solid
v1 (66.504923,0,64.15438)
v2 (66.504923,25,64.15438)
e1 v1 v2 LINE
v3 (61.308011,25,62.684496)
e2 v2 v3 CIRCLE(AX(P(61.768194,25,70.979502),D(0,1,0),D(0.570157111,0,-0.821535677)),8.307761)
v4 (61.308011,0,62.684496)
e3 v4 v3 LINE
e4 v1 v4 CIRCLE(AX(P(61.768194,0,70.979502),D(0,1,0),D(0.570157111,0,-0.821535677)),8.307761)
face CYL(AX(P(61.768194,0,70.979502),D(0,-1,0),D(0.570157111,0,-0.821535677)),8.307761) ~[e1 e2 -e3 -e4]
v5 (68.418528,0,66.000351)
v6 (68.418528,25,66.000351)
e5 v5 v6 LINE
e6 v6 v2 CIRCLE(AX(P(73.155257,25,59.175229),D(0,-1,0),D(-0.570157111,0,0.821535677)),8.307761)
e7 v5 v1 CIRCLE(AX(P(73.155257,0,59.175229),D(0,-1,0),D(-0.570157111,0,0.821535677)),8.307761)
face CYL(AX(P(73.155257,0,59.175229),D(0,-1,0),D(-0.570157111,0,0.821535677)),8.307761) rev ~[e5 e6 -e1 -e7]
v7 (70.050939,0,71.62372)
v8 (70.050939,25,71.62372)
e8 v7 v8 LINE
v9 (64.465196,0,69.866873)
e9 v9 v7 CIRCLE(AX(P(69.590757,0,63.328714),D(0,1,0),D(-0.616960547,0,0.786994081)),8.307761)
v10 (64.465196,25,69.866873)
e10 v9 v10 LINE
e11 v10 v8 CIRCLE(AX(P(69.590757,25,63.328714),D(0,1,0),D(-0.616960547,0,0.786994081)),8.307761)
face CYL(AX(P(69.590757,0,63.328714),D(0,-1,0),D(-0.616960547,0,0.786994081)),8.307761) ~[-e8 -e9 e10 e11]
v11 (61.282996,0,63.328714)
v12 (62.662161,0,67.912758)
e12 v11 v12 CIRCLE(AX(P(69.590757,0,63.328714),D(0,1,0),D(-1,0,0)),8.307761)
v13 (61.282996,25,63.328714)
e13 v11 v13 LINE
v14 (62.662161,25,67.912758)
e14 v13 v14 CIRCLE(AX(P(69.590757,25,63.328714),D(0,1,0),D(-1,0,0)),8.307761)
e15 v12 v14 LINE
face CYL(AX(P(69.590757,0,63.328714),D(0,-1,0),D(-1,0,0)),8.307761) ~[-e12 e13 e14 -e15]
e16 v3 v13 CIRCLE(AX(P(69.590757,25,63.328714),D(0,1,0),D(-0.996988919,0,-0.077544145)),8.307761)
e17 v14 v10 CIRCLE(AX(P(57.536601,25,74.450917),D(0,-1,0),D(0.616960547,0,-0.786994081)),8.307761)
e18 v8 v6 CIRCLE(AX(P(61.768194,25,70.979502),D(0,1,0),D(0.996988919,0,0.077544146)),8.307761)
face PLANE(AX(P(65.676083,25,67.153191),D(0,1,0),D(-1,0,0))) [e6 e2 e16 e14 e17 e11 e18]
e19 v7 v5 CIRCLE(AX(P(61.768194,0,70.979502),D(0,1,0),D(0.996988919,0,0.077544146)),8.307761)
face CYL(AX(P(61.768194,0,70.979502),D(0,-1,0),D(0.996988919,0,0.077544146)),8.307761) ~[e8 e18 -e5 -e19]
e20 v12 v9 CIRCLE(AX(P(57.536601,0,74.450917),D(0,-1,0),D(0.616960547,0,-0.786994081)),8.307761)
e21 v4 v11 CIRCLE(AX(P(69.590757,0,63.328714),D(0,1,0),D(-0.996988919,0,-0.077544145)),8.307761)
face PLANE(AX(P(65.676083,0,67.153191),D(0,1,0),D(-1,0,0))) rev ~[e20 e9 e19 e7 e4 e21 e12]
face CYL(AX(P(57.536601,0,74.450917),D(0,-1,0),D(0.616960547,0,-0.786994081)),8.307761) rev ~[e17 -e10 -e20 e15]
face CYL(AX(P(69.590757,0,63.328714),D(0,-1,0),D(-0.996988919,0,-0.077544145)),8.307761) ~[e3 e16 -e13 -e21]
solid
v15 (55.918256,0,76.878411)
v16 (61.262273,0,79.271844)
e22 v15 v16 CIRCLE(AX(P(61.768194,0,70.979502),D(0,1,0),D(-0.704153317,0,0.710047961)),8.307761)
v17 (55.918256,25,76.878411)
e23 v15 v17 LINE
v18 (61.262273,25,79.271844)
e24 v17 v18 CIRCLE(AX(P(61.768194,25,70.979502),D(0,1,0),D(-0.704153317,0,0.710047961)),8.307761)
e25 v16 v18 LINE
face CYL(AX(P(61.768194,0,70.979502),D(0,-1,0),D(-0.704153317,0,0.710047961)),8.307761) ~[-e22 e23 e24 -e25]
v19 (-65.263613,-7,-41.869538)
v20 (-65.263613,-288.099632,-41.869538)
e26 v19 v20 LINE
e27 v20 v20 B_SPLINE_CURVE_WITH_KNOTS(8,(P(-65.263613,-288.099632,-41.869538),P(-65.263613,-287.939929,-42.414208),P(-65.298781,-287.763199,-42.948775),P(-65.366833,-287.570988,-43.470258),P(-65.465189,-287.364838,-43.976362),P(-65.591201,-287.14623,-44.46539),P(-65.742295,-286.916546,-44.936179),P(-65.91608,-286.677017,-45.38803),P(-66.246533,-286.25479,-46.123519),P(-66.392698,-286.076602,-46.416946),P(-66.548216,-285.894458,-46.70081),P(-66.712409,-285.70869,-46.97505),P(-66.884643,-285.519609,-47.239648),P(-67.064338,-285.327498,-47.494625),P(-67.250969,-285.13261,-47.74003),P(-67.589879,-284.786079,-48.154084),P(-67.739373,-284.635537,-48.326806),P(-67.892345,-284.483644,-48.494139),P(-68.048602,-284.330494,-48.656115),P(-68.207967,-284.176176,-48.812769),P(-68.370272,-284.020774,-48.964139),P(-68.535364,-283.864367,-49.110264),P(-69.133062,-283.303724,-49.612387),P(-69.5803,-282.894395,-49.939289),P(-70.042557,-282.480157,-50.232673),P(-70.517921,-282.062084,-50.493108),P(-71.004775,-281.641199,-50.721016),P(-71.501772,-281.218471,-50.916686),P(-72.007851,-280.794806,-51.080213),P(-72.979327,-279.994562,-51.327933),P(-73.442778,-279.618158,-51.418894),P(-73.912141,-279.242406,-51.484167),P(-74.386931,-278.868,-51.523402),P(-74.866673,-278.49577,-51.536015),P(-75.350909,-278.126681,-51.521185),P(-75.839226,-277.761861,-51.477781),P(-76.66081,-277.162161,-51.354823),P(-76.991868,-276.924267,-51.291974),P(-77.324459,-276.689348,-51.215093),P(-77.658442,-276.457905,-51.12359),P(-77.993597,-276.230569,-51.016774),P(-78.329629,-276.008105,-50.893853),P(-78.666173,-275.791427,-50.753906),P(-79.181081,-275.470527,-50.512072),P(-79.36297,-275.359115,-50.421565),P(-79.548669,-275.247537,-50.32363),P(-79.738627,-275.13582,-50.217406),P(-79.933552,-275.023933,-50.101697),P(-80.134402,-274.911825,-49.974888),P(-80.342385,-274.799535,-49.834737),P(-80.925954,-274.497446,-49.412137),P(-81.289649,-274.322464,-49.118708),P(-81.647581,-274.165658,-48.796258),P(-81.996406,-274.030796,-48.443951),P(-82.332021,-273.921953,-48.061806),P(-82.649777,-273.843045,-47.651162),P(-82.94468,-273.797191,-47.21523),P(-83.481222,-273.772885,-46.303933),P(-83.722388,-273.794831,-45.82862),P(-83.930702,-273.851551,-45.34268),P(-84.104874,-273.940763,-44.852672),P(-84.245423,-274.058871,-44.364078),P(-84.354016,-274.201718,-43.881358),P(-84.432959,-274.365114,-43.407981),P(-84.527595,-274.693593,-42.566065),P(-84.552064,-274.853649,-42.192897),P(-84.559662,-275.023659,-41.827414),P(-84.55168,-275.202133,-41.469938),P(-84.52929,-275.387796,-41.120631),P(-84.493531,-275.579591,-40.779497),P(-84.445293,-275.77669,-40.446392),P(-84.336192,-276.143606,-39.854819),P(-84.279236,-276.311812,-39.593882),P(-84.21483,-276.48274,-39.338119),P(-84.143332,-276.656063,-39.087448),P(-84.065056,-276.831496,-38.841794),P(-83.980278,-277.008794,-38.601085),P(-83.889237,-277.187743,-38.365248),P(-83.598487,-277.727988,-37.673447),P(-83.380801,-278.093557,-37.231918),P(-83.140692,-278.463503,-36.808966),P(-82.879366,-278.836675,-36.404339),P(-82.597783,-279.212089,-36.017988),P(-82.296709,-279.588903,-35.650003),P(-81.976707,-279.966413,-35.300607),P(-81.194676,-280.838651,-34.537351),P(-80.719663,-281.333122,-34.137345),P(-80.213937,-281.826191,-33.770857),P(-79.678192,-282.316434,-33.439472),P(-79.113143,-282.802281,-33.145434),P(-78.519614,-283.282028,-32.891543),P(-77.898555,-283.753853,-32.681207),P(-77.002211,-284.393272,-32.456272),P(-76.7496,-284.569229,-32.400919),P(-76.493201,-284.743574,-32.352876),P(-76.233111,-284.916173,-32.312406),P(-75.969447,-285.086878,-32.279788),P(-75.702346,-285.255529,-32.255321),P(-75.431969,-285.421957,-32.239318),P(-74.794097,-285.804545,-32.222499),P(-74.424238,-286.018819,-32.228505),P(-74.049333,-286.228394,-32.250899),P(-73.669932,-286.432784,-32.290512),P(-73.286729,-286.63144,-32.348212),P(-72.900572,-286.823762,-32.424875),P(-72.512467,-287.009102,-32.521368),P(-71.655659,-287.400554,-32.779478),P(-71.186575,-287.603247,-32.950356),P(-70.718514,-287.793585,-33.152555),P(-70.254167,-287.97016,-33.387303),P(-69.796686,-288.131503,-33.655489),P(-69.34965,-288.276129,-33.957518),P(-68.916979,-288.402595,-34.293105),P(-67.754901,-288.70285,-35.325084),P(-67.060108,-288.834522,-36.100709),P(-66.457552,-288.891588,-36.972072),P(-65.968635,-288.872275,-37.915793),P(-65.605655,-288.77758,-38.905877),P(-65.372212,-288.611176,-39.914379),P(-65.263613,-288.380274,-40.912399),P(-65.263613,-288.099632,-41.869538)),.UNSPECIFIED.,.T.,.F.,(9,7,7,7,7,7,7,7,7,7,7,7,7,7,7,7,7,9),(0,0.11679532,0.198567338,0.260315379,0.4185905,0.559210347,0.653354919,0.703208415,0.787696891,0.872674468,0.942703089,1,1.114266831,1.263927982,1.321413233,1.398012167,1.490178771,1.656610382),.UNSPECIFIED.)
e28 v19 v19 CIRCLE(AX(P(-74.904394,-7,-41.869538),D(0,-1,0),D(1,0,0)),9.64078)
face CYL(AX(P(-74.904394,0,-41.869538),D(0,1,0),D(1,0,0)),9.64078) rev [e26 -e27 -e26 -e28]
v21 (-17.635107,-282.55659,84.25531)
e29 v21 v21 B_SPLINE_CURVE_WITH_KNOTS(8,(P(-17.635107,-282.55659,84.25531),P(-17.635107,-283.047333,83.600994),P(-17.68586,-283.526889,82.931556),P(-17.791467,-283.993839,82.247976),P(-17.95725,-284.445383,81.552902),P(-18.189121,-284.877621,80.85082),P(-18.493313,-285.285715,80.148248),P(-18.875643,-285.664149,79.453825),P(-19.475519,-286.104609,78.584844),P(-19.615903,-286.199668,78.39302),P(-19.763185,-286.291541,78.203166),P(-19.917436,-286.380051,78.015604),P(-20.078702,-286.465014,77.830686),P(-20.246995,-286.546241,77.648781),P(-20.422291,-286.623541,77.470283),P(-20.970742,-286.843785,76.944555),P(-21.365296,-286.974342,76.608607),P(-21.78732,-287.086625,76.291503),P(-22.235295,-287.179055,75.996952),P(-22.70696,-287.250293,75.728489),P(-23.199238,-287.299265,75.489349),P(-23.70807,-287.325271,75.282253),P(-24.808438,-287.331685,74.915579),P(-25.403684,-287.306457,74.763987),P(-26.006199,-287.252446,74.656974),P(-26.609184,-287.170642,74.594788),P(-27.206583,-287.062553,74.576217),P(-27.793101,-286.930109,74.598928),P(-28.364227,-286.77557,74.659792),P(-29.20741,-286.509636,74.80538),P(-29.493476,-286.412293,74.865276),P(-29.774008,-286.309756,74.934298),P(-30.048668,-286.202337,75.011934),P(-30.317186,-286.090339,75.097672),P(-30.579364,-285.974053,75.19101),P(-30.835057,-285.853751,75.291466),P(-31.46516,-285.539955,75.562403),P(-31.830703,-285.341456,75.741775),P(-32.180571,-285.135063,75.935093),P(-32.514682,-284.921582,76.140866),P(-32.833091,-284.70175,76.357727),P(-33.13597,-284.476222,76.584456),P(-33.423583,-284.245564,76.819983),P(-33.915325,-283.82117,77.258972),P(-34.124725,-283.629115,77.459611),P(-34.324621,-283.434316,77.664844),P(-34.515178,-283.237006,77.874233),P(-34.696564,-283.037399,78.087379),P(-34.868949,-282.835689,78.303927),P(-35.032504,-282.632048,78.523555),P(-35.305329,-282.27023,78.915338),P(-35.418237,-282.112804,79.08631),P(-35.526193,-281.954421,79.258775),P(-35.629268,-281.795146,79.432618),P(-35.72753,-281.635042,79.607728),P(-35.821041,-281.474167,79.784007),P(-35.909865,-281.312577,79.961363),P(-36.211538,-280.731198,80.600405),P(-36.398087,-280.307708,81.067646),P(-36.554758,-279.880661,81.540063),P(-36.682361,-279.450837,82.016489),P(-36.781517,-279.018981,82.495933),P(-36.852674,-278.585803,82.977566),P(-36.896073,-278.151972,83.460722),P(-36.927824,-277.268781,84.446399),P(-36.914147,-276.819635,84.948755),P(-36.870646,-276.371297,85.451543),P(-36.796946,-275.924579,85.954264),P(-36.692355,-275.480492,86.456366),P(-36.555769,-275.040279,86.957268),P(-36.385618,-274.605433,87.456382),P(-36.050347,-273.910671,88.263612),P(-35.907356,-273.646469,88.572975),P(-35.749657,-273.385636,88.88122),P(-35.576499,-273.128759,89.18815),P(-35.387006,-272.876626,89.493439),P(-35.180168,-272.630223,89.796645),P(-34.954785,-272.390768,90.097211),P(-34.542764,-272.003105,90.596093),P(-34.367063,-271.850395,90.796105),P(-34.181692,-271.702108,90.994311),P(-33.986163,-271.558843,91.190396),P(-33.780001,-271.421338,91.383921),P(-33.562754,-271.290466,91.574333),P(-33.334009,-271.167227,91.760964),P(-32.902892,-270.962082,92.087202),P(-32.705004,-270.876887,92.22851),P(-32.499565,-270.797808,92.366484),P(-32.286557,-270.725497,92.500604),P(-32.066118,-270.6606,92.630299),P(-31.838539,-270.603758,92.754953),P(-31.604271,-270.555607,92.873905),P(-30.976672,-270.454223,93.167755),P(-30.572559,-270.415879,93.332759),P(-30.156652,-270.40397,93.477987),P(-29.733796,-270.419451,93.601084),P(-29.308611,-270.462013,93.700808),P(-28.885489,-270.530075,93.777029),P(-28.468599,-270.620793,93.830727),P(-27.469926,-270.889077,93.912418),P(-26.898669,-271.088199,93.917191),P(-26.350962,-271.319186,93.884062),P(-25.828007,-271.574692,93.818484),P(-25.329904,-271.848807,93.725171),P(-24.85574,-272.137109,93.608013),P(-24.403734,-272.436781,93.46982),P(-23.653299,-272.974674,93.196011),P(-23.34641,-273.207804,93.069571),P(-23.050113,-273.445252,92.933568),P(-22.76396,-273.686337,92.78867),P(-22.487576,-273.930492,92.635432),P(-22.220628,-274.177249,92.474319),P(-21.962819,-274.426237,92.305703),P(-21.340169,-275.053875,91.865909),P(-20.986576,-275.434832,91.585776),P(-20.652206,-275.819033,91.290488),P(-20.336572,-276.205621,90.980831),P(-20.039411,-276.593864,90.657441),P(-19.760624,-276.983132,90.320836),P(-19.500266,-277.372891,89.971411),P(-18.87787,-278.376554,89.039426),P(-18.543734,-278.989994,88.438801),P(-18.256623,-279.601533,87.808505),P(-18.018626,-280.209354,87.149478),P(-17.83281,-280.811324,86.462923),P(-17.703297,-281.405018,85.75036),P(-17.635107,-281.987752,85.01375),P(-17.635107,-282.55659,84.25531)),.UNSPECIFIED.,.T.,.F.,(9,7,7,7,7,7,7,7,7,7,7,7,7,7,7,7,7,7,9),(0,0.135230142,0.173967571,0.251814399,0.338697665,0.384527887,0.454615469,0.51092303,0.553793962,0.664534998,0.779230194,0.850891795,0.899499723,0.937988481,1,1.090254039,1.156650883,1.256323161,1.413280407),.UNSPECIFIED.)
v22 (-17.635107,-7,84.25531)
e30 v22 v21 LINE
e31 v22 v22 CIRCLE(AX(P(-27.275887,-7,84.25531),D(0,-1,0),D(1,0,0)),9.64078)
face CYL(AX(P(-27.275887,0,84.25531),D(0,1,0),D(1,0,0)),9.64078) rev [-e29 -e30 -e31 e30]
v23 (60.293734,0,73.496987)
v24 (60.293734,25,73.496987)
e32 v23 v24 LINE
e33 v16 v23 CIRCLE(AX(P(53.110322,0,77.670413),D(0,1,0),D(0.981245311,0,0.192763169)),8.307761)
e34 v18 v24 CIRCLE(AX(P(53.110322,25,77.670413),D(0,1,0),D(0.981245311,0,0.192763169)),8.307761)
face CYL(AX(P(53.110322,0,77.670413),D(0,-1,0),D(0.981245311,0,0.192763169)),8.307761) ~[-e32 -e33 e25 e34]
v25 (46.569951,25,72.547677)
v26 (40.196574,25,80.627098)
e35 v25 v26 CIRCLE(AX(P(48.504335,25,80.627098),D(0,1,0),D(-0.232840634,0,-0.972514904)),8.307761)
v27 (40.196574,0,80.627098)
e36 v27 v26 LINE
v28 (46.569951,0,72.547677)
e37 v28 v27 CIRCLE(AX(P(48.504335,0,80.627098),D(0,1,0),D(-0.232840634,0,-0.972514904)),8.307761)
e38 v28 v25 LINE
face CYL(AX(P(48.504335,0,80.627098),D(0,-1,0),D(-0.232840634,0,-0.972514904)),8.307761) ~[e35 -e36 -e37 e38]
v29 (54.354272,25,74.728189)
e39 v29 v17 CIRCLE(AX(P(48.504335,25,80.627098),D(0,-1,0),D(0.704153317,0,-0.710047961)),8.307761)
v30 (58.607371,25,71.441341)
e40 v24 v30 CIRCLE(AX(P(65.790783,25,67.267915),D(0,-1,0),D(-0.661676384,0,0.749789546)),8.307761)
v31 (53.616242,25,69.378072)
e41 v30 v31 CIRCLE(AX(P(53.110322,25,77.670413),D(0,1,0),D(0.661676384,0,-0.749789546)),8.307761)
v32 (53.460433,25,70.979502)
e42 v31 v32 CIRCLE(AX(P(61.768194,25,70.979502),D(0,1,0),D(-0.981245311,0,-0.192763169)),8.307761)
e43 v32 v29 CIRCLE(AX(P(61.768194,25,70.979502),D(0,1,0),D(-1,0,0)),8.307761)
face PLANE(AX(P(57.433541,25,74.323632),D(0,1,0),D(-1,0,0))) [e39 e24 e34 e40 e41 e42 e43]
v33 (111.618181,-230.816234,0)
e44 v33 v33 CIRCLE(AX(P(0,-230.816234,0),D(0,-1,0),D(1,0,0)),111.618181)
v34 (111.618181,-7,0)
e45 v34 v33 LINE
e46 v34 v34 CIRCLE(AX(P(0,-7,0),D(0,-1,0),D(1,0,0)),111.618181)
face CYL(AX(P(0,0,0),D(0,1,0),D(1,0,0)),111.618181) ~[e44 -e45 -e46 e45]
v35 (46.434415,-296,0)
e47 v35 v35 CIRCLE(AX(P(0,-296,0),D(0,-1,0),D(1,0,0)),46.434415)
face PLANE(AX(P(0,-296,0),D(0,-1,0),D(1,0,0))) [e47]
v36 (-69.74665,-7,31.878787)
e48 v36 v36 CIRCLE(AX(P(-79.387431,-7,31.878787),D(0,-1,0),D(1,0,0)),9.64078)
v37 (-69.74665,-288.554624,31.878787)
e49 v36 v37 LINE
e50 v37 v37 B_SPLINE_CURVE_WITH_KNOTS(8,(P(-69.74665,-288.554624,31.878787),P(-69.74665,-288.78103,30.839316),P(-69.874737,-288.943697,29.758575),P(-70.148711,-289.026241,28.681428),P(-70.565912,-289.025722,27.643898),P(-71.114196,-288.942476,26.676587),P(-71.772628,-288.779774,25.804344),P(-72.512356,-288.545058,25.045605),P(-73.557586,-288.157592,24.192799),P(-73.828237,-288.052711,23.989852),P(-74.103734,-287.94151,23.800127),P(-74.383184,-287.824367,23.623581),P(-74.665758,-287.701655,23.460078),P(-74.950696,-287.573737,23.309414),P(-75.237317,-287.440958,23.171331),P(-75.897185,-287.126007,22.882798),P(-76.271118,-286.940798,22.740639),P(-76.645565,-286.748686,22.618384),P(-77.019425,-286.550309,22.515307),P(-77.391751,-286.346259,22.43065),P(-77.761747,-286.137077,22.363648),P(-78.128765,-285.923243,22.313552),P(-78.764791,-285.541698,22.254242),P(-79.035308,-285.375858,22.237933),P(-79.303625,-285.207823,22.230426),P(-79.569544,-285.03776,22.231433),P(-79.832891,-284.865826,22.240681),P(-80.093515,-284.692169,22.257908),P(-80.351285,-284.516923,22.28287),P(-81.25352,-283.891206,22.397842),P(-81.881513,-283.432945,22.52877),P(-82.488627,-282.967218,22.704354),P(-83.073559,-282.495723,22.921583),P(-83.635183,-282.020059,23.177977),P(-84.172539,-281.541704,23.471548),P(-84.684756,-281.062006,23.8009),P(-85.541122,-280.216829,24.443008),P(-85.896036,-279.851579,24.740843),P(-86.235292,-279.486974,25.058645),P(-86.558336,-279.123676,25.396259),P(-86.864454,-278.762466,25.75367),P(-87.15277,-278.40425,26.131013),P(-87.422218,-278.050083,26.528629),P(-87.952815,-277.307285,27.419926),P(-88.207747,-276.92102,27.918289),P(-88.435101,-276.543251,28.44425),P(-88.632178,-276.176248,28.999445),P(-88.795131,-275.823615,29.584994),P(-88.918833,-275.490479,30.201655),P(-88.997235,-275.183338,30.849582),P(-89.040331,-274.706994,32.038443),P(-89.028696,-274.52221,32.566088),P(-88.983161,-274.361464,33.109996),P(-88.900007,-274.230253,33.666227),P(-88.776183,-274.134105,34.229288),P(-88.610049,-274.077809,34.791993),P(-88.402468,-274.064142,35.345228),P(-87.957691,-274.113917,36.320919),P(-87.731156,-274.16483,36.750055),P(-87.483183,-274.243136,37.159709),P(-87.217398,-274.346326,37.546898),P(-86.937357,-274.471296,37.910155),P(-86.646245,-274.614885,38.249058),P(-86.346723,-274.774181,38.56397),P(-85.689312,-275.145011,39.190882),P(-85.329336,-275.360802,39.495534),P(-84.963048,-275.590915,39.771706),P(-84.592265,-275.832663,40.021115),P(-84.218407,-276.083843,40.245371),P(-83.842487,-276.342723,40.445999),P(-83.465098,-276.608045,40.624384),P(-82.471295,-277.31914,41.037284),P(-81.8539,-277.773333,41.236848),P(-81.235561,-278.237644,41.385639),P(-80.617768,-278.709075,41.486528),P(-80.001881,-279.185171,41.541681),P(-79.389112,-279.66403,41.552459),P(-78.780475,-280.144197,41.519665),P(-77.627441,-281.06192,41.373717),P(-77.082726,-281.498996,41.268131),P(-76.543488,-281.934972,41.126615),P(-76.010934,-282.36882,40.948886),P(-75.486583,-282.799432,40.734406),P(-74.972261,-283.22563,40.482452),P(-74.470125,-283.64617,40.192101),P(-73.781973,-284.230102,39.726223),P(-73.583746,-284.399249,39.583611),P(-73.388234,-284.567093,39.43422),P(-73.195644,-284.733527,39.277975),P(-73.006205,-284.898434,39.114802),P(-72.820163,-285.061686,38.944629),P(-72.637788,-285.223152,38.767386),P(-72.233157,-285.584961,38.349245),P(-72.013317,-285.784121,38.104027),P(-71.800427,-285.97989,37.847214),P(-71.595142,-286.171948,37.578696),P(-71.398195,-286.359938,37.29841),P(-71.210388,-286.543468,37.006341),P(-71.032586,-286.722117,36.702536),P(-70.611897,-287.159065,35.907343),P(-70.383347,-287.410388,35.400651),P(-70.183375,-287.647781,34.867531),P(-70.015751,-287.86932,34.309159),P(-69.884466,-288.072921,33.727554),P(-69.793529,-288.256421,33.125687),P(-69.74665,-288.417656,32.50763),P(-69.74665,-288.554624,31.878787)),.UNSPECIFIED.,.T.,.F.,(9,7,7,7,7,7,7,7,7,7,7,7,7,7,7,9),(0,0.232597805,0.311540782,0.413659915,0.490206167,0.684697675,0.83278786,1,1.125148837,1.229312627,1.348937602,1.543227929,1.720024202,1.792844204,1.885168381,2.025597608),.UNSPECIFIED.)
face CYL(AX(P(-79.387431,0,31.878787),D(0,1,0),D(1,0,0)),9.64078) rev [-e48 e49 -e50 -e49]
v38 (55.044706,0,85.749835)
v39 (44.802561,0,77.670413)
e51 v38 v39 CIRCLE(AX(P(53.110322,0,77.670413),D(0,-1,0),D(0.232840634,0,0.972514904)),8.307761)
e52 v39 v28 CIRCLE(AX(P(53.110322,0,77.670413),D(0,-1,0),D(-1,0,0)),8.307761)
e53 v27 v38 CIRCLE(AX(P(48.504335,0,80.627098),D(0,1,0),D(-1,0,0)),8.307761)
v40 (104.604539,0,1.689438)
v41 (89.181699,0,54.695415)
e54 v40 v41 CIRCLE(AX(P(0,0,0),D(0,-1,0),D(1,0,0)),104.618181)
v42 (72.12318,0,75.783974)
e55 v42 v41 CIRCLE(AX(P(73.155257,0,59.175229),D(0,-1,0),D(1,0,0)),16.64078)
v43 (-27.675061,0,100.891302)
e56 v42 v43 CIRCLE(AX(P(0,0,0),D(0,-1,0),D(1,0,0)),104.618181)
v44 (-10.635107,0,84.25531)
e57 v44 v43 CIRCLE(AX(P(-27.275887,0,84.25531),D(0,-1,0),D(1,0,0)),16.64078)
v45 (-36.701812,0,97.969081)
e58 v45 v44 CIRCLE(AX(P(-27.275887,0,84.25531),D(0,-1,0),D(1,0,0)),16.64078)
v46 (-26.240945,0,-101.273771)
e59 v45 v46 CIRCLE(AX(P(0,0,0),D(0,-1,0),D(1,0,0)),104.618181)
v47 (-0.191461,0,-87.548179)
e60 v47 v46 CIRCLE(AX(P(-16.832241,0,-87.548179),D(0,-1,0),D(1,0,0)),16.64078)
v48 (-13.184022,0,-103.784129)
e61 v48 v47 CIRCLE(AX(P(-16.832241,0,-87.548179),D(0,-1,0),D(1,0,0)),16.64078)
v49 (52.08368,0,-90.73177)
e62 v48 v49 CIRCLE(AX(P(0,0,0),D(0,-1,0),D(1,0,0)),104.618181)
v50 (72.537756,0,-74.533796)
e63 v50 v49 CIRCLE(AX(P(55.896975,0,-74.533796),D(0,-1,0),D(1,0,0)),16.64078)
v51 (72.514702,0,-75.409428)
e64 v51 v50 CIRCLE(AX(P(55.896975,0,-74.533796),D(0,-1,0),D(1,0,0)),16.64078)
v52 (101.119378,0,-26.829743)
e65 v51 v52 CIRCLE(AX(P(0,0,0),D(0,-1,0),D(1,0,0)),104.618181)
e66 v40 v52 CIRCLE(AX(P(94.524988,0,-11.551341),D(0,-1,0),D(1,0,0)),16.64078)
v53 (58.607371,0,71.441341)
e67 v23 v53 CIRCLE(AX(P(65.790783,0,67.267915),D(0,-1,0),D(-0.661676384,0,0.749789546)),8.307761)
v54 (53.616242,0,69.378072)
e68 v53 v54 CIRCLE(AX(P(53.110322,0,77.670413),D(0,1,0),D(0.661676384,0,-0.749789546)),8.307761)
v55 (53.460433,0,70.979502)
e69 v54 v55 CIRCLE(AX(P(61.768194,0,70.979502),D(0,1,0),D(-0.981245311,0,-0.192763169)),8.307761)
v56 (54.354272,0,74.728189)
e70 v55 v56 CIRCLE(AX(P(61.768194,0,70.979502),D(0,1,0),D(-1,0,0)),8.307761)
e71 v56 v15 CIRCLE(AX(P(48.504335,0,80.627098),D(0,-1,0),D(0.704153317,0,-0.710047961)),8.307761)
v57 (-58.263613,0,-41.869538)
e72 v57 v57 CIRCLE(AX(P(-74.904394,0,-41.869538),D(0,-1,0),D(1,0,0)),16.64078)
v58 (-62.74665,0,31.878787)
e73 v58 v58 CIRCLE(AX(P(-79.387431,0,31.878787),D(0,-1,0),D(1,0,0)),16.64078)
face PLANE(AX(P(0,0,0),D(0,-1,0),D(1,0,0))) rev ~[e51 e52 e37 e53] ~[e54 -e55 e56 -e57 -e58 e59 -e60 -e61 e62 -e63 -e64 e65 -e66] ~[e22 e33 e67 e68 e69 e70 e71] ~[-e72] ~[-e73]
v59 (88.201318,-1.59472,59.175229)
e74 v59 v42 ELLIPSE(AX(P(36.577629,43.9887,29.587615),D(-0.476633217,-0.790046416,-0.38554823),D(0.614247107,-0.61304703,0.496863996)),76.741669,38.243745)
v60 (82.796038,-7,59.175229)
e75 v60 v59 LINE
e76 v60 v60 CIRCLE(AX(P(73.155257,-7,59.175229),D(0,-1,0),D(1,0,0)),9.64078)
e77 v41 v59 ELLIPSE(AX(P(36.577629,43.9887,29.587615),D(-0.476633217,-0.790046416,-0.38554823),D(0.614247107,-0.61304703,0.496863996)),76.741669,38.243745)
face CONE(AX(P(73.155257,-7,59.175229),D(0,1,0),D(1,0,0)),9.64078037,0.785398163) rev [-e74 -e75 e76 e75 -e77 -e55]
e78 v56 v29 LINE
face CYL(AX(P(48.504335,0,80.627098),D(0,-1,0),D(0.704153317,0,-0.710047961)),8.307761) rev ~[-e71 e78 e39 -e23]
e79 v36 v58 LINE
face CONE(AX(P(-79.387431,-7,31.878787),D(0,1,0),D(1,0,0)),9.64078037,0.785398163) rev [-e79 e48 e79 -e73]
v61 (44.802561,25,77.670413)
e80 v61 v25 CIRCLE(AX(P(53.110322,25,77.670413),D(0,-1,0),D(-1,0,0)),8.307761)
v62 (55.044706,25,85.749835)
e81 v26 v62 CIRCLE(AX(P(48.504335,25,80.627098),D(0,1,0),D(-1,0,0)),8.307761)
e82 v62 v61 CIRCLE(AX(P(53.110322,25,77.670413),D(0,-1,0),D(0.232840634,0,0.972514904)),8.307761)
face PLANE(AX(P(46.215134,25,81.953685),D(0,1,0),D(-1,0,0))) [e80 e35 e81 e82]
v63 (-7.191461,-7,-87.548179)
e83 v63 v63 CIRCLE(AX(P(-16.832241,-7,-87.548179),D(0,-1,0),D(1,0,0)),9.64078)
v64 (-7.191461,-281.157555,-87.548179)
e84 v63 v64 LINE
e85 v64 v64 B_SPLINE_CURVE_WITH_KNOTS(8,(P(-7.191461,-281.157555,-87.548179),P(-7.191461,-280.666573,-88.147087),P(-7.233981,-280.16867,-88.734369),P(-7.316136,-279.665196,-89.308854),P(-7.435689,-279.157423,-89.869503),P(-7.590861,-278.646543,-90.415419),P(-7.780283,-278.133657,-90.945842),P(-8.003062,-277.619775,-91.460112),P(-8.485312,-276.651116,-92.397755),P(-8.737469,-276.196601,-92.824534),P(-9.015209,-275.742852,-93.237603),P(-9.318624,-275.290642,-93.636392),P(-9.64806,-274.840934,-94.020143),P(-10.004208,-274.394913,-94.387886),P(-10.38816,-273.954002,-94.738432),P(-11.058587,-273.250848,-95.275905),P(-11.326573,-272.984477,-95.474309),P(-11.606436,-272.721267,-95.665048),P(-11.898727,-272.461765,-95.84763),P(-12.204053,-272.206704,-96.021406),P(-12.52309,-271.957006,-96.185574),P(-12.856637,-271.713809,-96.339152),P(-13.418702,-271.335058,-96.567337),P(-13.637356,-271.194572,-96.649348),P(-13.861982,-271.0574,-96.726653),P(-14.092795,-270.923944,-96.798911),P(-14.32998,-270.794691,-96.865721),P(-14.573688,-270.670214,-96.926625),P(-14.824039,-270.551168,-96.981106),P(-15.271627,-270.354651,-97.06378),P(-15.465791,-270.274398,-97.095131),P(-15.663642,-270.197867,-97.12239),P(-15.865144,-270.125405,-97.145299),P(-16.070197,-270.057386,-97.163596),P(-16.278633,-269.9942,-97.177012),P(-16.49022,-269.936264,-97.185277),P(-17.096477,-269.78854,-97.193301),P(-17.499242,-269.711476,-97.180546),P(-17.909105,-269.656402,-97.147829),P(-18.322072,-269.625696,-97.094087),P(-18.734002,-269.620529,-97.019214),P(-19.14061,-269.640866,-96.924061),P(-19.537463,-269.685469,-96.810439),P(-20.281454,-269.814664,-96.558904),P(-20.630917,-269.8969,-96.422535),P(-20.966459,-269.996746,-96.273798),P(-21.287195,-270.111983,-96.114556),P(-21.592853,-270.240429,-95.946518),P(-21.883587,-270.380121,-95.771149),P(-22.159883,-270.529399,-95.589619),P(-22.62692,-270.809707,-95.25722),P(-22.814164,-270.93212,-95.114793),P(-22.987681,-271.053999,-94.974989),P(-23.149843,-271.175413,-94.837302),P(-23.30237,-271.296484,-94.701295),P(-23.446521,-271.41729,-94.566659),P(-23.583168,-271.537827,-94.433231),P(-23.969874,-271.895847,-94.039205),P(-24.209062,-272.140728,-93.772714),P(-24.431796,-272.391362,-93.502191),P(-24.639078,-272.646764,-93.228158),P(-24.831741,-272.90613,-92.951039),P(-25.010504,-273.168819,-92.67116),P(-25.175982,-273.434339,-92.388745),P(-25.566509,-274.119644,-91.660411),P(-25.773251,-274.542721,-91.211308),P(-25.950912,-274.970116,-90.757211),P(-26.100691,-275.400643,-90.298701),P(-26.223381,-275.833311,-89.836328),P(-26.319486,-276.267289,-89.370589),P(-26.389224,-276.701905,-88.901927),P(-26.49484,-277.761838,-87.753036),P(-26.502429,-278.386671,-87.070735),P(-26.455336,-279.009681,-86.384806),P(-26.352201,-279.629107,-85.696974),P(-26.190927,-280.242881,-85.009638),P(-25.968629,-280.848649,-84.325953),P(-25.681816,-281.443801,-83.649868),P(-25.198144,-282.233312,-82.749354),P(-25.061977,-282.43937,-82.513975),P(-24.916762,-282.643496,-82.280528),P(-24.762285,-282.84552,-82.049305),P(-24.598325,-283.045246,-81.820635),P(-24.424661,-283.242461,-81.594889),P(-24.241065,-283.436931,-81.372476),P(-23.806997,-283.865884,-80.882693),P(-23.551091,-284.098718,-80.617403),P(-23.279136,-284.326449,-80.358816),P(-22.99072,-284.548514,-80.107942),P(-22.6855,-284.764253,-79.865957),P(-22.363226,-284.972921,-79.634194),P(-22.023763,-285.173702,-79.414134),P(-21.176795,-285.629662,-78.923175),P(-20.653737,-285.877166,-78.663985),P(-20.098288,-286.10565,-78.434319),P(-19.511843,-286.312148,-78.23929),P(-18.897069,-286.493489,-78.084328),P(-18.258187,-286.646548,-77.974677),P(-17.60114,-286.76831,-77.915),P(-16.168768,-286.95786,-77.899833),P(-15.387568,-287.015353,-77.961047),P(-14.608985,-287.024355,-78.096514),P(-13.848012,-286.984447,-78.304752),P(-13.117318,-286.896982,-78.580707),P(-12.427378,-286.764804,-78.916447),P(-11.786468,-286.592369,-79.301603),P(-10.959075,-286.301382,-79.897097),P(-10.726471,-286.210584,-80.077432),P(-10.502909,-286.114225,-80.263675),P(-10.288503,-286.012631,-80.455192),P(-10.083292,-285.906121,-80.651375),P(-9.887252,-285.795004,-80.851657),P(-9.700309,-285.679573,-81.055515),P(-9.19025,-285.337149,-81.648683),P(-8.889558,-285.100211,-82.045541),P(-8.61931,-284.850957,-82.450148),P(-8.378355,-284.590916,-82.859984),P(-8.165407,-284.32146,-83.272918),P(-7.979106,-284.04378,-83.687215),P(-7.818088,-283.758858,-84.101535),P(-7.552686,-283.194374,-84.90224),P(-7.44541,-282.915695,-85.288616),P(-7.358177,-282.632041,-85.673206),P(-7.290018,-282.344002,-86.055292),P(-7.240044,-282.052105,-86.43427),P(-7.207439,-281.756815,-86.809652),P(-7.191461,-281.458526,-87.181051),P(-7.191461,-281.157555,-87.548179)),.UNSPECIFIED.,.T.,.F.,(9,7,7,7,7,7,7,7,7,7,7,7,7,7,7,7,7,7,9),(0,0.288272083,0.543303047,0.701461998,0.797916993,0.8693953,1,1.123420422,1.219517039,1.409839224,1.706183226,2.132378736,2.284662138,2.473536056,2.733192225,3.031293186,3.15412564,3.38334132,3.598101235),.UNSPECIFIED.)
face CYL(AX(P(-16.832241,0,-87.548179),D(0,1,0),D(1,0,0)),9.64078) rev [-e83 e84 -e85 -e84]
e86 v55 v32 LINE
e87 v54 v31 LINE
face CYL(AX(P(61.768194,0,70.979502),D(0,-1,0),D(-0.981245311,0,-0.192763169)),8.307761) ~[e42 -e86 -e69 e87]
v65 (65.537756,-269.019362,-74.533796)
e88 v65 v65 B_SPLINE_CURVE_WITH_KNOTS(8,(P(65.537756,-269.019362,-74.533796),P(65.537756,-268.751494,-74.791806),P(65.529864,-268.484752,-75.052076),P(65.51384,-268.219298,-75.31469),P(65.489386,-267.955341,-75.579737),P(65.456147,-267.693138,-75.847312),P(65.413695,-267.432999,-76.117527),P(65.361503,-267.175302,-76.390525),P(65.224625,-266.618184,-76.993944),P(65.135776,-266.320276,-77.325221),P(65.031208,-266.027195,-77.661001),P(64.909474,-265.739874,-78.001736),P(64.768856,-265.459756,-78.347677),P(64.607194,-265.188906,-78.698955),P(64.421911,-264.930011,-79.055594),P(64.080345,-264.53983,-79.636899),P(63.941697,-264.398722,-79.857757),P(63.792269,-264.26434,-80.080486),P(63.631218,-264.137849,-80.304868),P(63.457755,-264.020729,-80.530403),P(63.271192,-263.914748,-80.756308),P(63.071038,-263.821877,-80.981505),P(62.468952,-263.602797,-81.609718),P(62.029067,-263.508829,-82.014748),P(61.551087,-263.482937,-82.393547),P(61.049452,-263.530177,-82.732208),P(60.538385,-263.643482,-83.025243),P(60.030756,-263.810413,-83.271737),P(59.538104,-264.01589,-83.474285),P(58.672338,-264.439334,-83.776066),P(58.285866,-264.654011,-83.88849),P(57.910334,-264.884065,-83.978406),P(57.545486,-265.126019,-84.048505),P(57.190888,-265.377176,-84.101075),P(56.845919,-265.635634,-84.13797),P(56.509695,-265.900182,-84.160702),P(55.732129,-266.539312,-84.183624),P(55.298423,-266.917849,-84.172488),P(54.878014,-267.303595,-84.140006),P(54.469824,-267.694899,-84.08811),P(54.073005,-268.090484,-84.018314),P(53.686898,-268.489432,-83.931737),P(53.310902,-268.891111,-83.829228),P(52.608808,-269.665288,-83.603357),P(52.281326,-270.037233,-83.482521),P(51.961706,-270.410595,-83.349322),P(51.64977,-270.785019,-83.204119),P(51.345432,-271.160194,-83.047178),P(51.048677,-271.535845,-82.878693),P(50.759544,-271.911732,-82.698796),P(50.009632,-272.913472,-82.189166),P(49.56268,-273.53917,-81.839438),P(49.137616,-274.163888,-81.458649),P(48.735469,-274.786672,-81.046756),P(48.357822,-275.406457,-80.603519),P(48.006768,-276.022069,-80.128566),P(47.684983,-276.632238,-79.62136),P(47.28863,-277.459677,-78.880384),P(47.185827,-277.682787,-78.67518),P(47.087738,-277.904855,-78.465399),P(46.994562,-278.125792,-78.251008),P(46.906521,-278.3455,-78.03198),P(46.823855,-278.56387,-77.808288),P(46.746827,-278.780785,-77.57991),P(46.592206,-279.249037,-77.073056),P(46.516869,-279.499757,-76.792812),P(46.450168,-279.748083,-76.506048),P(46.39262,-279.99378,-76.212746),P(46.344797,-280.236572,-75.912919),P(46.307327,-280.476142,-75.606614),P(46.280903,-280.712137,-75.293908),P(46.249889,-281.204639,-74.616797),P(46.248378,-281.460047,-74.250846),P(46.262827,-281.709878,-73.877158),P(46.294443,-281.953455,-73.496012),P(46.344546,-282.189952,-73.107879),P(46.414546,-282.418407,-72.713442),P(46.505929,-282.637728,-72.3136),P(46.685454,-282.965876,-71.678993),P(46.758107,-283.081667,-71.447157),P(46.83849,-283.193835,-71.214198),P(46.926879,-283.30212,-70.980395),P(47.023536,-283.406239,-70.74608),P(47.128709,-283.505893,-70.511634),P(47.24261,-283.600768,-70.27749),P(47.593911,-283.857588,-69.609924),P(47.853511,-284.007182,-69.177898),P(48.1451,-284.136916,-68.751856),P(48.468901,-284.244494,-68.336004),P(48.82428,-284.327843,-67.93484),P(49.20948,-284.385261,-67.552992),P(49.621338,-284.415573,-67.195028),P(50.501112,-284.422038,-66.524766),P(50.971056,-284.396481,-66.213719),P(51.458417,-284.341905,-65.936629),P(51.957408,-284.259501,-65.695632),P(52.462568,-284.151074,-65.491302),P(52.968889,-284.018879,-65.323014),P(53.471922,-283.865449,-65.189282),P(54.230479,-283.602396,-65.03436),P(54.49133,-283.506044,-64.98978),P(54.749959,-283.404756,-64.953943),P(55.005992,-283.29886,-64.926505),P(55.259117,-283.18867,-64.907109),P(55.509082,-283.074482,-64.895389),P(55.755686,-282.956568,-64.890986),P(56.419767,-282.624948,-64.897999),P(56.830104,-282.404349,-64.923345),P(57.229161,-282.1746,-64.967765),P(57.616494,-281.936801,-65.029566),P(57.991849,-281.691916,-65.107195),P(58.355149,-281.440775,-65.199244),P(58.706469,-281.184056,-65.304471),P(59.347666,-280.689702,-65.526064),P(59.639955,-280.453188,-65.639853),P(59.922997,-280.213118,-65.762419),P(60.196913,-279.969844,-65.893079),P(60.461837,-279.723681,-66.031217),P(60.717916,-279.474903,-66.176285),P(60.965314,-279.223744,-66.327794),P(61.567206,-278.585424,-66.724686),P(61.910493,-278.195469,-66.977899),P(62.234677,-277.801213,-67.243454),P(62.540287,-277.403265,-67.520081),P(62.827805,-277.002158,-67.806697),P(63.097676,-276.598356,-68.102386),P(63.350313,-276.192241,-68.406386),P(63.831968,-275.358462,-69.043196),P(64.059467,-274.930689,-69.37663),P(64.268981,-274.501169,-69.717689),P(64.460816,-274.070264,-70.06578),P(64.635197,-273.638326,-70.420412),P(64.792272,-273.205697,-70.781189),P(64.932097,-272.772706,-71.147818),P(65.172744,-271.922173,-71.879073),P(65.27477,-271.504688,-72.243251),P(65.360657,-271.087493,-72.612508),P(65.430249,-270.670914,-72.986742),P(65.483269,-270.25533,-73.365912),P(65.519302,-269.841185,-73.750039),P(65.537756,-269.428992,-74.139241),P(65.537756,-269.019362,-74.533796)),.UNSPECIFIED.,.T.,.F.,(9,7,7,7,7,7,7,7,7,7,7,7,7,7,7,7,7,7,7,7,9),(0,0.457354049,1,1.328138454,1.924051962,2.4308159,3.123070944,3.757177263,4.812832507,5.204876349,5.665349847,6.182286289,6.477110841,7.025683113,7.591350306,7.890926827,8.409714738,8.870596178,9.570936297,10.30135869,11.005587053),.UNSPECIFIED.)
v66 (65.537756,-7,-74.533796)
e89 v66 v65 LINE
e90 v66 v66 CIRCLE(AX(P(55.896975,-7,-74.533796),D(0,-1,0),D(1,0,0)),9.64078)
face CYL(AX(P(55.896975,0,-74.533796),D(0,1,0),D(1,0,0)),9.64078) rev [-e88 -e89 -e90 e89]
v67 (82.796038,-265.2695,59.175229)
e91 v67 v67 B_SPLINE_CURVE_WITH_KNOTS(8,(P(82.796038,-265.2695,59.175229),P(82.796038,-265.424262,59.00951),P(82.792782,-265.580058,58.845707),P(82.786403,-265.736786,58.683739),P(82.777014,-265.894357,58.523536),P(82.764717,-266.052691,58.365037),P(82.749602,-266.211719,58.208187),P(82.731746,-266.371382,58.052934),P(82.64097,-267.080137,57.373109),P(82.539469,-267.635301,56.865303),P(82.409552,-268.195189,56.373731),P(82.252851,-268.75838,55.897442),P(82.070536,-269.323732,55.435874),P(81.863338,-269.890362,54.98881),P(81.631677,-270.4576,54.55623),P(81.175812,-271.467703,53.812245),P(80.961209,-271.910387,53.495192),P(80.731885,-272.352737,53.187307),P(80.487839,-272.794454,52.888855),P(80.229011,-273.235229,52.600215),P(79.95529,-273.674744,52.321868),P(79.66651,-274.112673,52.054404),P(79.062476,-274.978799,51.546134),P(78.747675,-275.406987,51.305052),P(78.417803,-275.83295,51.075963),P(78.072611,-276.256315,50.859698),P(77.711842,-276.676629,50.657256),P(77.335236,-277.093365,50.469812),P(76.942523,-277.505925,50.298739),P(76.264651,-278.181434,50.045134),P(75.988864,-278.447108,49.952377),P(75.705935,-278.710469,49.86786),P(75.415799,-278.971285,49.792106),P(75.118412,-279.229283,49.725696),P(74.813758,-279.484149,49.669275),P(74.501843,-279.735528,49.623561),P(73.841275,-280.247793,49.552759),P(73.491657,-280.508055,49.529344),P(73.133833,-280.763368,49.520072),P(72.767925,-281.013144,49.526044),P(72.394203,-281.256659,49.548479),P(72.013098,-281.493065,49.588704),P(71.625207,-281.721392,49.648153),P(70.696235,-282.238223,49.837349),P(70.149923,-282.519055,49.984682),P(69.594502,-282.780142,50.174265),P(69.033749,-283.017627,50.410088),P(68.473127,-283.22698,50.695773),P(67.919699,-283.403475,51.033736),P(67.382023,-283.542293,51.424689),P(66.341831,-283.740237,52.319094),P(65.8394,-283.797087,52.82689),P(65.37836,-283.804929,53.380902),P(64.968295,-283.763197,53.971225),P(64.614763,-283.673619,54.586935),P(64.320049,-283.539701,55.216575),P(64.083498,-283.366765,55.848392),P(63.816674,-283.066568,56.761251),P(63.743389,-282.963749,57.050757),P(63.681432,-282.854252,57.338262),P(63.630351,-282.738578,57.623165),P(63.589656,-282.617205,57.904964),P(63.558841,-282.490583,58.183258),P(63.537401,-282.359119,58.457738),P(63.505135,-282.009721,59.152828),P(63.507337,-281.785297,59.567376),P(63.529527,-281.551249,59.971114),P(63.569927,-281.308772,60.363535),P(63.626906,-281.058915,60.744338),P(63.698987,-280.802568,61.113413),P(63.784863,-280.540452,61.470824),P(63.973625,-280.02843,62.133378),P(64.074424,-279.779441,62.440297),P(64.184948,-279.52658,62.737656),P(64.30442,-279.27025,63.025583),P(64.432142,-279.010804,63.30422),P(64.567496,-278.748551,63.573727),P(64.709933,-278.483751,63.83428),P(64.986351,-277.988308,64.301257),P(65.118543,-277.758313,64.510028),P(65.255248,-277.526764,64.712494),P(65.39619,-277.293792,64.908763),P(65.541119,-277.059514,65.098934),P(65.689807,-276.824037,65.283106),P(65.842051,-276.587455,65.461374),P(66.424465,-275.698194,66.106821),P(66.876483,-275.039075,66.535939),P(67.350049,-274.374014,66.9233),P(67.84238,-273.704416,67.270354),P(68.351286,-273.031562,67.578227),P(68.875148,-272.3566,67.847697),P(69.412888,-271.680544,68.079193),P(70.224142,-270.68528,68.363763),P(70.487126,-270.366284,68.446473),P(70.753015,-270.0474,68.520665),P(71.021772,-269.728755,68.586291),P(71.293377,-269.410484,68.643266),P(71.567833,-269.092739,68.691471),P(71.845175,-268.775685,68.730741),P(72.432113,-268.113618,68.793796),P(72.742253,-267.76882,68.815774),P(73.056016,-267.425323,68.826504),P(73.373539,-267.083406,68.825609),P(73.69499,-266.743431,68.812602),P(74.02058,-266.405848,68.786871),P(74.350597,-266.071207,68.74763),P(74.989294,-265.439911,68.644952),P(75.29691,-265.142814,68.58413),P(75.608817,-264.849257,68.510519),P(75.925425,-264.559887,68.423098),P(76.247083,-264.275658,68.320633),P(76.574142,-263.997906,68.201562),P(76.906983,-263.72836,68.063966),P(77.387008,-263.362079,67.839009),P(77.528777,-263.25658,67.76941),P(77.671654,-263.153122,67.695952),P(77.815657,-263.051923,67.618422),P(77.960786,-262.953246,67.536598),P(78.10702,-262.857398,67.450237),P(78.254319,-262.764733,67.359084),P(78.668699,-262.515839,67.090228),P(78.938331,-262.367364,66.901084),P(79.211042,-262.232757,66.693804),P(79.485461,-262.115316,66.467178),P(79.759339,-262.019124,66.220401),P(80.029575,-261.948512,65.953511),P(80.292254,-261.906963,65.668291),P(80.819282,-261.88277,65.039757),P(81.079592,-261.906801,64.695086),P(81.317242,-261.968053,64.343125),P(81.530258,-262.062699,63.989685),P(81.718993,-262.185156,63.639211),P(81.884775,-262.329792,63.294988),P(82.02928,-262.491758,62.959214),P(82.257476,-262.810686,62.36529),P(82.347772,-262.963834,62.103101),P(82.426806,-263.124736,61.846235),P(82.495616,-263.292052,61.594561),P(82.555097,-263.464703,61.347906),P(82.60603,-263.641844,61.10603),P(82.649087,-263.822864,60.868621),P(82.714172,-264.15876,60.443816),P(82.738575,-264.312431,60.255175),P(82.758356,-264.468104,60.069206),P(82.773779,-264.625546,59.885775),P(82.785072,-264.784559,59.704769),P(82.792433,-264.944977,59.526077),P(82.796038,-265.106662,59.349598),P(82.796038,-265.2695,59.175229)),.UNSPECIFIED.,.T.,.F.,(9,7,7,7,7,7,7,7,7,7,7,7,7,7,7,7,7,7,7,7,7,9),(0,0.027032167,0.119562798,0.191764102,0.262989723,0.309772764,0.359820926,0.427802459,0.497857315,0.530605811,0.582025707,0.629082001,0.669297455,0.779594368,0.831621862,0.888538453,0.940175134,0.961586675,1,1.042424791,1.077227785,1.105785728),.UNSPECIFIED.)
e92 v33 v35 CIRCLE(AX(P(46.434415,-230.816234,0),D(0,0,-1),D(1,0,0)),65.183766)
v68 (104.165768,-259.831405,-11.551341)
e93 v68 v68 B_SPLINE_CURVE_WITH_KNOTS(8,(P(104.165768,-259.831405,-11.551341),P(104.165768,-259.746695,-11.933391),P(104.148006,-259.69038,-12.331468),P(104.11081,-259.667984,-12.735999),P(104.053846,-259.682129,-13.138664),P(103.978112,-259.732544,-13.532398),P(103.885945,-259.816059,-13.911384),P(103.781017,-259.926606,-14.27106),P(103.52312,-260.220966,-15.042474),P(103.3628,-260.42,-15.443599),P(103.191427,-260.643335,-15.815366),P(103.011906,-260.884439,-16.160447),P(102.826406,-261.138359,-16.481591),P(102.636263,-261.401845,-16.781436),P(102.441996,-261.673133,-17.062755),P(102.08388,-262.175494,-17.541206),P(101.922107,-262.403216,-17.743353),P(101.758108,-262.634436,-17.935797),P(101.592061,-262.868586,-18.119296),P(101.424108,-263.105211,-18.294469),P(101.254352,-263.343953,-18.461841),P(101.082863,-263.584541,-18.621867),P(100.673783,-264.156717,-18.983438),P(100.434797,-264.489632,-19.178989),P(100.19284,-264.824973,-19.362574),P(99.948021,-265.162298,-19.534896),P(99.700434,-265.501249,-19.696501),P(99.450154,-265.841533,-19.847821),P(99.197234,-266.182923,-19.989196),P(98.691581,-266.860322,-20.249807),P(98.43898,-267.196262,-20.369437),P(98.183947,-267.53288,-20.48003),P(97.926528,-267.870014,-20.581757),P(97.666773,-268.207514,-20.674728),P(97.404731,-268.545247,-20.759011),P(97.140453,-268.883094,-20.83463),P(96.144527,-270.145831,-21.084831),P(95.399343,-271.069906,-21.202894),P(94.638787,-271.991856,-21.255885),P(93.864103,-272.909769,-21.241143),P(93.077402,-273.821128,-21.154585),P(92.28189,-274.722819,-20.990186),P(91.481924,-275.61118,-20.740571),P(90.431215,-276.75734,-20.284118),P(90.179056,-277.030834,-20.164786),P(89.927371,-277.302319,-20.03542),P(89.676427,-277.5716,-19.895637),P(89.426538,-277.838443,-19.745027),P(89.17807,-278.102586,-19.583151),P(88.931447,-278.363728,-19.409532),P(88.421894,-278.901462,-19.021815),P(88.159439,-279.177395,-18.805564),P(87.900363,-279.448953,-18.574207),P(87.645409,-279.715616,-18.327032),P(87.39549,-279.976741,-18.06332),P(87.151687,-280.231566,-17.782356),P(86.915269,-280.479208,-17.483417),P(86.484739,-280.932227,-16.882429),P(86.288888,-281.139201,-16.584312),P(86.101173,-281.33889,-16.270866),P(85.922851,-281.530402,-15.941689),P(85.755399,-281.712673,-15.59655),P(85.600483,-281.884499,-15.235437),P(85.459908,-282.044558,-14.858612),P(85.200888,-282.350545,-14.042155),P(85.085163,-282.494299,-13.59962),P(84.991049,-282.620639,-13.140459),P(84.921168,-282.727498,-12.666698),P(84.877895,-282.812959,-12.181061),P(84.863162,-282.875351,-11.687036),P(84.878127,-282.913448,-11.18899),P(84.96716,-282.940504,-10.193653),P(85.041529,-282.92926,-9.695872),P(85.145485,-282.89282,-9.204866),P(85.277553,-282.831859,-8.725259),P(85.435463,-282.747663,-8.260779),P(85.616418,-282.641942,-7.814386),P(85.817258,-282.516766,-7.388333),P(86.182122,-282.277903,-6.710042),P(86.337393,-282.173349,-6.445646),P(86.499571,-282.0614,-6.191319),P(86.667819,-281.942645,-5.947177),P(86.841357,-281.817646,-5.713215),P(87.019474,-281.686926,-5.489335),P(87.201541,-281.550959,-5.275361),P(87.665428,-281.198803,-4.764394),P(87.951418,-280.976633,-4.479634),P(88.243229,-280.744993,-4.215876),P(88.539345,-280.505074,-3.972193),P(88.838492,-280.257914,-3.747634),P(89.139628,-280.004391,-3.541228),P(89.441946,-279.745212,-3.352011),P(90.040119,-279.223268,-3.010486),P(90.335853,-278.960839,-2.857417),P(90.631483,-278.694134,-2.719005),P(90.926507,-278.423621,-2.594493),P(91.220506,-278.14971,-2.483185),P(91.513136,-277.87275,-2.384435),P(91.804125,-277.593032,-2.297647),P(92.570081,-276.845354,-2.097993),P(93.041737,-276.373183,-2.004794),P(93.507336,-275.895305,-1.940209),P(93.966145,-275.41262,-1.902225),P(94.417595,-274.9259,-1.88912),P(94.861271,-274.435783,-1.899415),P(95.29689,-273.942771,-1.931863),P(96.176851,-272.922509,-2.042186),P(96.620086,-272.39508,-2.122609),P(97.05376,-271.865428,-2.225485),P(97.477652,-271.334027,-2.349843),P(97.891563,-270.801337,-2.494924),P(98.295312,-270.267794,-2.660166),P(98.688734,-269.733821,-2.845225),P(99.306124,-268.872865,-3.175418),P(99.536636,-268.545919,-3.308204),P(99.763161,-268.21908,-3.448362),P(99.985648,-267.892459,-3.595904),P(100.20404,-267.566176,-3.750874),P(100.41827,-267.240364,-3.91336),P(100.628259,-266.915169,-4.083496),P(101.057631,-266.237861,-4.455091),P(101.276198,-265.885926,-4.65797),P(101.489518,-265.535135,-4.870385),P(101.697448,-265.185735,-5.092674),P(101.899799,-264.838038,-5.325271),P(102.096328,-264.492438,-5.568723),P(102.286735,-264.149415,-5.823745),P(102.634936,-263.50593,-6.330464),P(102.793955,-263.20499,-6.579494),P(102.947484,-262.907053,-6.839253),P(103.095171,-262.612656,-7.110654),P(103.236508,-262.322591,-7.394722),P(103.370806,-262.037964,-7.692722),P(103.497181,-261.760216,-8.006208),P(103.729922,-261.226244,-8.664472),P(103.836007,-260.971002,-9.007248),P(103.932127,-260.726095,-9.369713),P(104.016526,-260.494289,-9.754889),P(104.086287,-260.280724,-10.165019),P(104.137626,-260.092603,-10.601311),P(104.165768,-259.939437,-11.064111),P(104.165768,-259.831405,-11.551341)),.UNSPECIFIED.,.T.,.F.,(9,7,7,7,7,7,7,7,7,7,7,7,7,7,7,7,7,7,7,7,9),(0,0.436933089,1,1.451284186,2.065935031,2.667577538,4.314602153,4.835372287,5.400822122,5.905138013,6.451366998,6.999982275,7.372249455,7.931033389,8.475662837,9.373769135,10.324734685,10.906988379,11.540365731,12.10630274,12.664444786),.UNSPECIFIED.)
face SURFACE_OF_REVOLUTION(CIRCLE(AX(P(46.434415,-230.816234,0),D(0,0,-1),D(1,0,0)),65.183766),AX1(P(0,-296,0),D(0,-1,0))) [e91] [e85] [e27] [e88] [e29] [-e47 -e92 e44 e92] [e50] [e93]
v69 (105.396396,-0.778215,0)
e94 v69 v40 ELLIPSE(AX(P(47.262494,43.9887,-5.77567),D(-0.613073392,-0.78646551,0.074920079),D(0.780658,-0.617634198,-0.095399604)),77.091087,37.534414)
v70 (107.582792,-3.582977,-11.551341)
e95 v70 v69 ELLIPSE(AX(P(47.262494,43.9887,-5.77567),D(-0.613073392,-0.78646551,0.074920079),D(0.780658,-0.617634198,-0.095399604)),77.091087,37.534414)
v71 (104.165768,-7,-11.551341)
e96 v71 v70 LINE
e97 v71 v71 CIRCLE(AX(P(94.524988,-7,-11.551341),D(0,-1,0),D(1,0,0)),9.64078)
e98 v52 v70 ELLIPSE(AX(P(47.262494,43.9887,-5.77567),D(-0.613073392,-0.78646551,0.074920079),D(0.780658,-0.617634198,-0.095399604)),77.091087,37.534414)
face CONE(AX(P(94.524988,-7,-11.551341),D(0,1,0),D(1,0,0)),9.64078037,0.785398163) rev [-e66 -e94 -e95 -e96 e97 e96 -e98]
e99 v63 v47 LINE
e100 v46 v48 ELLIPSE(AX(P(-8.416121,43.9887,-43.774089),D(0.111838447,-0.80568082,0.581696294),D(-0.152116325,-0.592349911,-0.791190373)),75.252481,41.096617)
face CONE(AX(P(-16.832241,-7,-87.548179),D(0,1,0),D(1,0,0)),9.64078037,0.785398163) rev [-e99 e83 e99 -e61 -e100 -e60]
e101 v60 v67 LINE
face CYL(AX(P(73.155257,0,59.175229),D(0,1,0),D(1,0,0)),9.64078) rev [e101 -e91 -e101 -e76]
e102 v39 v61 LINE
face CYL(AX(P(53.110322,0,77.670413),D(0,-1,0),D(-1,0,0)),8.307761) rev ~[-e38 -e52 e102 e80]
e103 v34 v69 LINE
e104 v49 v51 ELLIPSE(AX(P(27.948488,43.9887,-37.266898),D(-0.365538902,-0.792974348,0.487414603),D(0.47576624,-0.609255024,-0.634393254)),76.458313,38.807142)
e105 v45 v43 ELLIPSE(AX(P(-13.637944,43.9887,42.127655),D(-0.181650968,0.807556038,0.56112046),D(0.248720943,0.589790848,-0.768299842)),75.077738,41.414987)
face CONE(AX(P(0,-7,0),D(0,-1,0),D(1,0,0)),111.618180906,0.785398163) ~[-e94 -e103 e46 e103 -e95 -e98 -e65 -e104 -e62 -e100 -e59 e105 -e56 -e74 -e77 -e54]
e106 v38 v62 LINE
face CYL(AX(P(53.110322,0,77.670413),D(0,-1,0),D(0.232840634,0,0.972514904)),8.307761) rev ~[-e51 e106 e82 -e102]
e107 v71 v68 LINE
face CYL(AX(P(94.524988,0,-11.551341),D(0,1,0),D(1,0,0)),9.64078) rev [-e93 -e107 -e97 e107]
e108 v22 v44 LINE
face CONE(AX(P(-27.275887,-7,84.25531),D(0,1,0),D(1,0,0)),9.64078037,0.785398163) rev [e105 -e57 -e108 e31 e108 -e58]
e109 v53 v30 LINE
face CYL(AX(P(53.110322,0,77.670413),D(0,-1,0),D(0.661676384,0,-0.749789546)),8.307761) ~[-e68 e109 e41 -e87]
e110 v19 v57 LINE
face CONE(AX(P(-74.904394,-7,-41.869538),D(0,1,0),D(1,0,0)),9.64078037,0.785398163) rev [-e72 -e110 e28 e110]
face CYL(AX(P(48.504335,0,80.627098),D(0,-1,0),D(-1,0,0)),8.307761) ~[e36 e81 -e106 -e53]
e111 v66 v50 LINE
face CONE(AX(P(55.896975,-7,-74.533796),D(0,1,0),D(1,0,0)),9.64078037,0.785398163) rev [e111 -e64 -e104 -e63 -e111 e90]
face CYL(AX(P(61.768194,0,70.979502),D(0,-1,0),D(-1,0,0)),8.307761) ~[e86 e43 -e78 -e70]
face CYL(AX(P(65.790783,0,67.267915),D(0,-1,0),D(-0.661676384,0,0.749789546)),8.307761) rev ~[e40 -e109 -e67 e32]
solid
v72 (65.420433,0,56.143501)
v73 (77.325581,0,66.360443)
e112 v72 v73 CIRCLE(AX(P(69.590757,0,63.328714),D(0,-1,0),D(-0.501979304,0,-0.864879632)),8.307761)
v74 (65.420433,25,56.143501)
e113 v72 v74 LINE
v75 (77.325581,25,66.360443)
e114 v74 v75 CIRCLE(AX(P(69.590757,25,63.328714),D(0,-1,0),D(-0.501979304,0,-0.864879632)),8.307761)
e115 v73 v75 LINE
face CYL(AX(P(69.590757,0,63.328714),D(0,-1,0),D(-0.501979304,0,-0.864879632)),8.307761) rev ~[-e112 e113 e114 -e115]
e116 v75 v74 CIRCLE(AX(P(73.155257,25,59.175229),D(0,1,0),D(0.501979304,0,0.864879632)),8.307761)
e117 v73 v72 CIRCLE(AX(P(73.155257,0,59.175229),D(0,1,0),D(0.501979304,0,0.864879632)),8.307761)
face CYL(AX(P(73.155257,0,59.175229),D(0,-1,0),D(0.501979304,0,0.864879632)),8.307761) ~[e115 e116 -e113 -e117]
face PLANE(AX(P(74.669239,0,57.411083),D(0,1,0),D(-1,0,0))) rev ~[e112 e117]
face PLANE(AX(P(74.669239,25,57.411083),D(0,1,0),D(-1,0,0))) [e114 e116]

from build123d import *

# Parameters (mm, degrees)
F0_R     = 111.6181809064
F0_R_2   = 9.6407803701
F1_DEPTH = 296
F5_DEPTH = 25


# Not quite as in the source:
# - a fillet or chamfer that OpenCascade refuses, or shapes differently, is made with other operations: its cross-section is extruded or revolved along the edge and cut away or added


with BuildPart() as f1:
    # F0 (on Front) → F1 (new body)
    with BuildSketch(Plane.XZ):
        Circle(F0_R)
        with Locations((-16.8322412, -87.5481787514)):
            Circle(F0_R_2, mode=Mode.SUBTRACT)
        with Locations((-74.9043936204, -41.8695382418)):
            Circle(F0_R_2, mode=Mode.SUBTRACT)
        with Locations((55.8969753172, -74.5337963101)):
            Circle(F0_R_2, mode=Mode.SUBTRACT)
        with Locations((94.5249877968, -11.5513405195)):
            Circle(F0_R_2, mode=Mode.SUBTRACT)
        with Locations((-79.3874307759, 31.8787869147)):
            Circle(F0_R_2, mode=Mode.SUBTRACT)
        with Locations((-27.2758874883, 84.2553097252)):
            Circle(F0_R_2, mode=Mode.SUBTRACT)
        with Locations((73.1552572663, 59.1752294708)):
            Circle(F0_R_2, mode=Mode.SUBTRACT)
    extrude(amount=F1_DEPTH)

    # F2: fillet of radius 65.1837661841 on 1 edges, made by hand

    # F2_s1 → F2_t2 (revolve, cut)
    with BuildSketch(Plane.XY):
        with BuildLine():
            ThreePointArc((111.6181809064, -230.8162338159), (92.5262978144, -276.908116908), (46.4344147224, -296))
            Line((46.4344147224, -296), (111.6181809064, -296))
            Line((111.6181809064, -296), (111.6181809064, -230.8162338159))
        make_face()
    revolve(axis=Axis((0, -296, 0), (0, -1, 0)), mode=Mode.SUBTRACT)

    # F3: chamfer of 7 on 8 edges, made by hand

    # F3_s1 → F3_t2 (revolve, cut)
    with BuildSketch(Plane.XY.offset(84.2553097252)):
        Polygon((-17.6351071181, -7), (-10.6351071181, 0), (-17.6351071181, 0), align=None)
    revolve(axis=Axis((-27.2758874883, 0, 84.2553097252), (0, -1, 0)), mode=Mode.SUBTRACT)

    # F3_s3 → F3_t4 (revolve, cut)
    with BuildSketch(Plane.XY.offset(31.8787869147)):
        Polygon((-69.7466504057, -7), (-62.7466504057, 0), (-69.7466504057, 0), align=None)
    revolve(axis=Axis((-79.3874307759, 0, 31.8787869147), (0, -1, 0)), mode=Mode.SUBTRACT)

    # F3_s5 → F3_t6 (revolve, cut)
    with BuildSketch(Plane.XY):
        Polygon((111.6181809064, -7), (104.6181809064, 0), (111.6181809064, 0), align=None)
    revolve(axis=Axis((0, 0, 0), (0, -1, 0)), mode=Mode.SUBTRACT)

    # F3_s7 → F3_t8 (revolve, cut)
    with BuildSketch(Plane.XY.offset(-87.5481787514)):
        Polygon((-7.1914608299, -7), (-0.1914608299, 0), (-7.1914608299, 0), align=None)
    revolve(axis=Axis((-16.8322412, 0, -87.5481787514), (0, -1, 0)), mode=Mode.SUBTRACT)

    # F3_s9 → F3_t10 (revolve, cut)
    with BuildSketch(Plane.XY.offset(-41.8695382418)):
        Polygon((-65.2636132502, -7), (-58.2636132502, 0), (-65.2636132502, 0), align=None)
    revolve(axis=Axis((-74.9043936204, 0, -41.8695382418), (0, -1, 0)), mode=Mode.SUBTRACT)

    # F3_s11 → F3_t12 (revolve, cut)
    with BuildSketch(Plane.XY.offset(-74.5337963101)):
        Polygon((65.5377556874, -7), (72.5377556874, 0), (65.5377556874, 0), align=None)
    revolve(axis=Axis((55.8969753172, 0, -74.5337963101), (0, -1, 0)), mode=Mode.SUBTRACT)

    # F3_s13 → F3_t14 (revolve, cut)
    with BuildSketch(Plane.XY.offset(-11.5513405195)):
        Polygon((104.165768167, -7), (111.165768167, 0), (104.165768167, 0), align=None)
    revolve(axis=Axis((94.5249877968, 0, -11.5513405195), (0, -1, 0)), mode=Mode.SUBTRACT)

    # F3_s15 → F3_t16 (revolve, cut)
    with BuildSketch(Plane.XY.offset(59.1752294708)):
        Polygon((82.7960376364, -7), (89.7960376364, 0), (82.7960376364, 0), align=None)
    revolve(axis=Axis((73.1552572663, 0, 59.1752294708), (0, -1, 0)), mode=Mode.SUBTRACT)

    # F4 (on face) → F5, piece 3 (join)
    with BuildSketch(Plane(origin=(0, 0, 0), x_dir=(-1, 0, 0), z_dir=(0, 1, 0))):
        with BuildLine():
            ThreePointArc((-58.6073712589, 71.4413412829), (-56.284149618, 69.992802613), (-53.6162424185, 69.3780715775))
            ThreePointArc((-53.6162424185, 69.3780715775), (-53.4994770648, 70.1750058259), (-53.4604329494, 70.9795018801))
            ThreePointArc((-53.4604329494, 70.9795018801), (-53.6869817261, 72.906391019), (-54.3542722966, 74.7281894153))
            ThreePointArc((-54.3542722966, 74.7281894153), (-55.222843002, 75.7403261506), (-55.9182564321, 76.8784105071))
            ThreePointArc((-55.9182564321, 76.8784105071), (-58.3724078083, 78.5615548701), (-61.2622734735, 79.2718437982))
            ThreePointArc((-61.2622734735, 79.2718437982), (-61.3036475349, 76.2962561065), (-60.2937336183, 73.4969869509))
            ThreePointArc((-60.2937336183, 73.4969869509), (-59.3677818798, 72.5370654858), (-58.6073712589, 71.4413412829))
        make_face()
        with BuildLine():
            ThreePointArc((-44.8025613038, 77.6704134956), (-45.2568282643, 74.9608888065), (-46.5699506643, 72.5476768235))
            ThreePointArc((-46.5699506643, 72.5476768235), (-41.9817092657, 75.4817852348), (-40.1965741405, 80.6270980422))
            ThreePointArc((-40.1965741405, 80.6270980422), (-45.7948102708, 88.4805919011), (-55.0447064188, 85.7498347143))
            ThreePointArc((-55.0447064188, 85.7498347143), (-47.9650093158, 84.1930391898), (-44.8025613038, 77.6704134956))
        make_face()
    extrude(amount=F5_DEPTH)


with BuildPart() as f5:
    # F4 (on face) → F5 (new body)
    with BuildSketch(Plane(origin=(0, 0, 0), x_dir=(-1, 0, 0), z_dir=(0, 1, 0))):
        with BuildLine():
            ThreePointArc((-68.4185283557, 66.0003513789), (-67.3873974914, 65.154416995), (-66.5049226793, 64.154379972))
            ThreePointArc((-66.5049226793, 64.154379972), (-64.0292447566, 62.9853453728), (-61.3080110738, 62.6844960501))
            ThreePointArc((-61.3080110738, 62.6844960501), (-61.2892519266, 63.0063624098), (-61.2829957366, 63.3287142659))
            ThreePointArc((-61.2829957366, 63.3287142659), (-61.6352552844, 65.722224105), (-62.6621614287, 67.9127582658))
            ThreePointArc((-62.6621614287, 67.9127582658), (-63.6423610727, 68.8172163903), (-64.4651958955, 69.8668728558))
            ThreePointArc((-64.4651958955, 69.8668728558), (-67.0981543121, 71.2537268139), (-70.050939251, 71.6237200959))
            ThreePointArc((-70.050939251, 71.6237200959), (-69.7465889094, 68.6634490282), (-68.4185283557, 66.0003513789))
        make_face()
    extrude(amount=F5_DEPTH)


with BuildPart() as f5b:
    # F4 (on face) → F5, piece 2 (new body)
    with BuildSketch(Plane(origin=(0, 0, 0), x_dir=(-1, 0, 0), z_dir=(0, 1, 0))):
        with BuildLine():
            ThreePointArc((-77.3255812582, 66.3604425946), (-78.5656998997, 52.8707865657), (-65.4204325641, 56.1435011421))
            ThreePointArc((-65.4204325641, 56.1435011421), (-75.0011991894, 57.0242713608), (-77.3255812582, 66.3604425946))
        make_face()
    extrude(amount=F5_DEPTH)


solid = Compound([f1.part, f5.part, f5b.part])
